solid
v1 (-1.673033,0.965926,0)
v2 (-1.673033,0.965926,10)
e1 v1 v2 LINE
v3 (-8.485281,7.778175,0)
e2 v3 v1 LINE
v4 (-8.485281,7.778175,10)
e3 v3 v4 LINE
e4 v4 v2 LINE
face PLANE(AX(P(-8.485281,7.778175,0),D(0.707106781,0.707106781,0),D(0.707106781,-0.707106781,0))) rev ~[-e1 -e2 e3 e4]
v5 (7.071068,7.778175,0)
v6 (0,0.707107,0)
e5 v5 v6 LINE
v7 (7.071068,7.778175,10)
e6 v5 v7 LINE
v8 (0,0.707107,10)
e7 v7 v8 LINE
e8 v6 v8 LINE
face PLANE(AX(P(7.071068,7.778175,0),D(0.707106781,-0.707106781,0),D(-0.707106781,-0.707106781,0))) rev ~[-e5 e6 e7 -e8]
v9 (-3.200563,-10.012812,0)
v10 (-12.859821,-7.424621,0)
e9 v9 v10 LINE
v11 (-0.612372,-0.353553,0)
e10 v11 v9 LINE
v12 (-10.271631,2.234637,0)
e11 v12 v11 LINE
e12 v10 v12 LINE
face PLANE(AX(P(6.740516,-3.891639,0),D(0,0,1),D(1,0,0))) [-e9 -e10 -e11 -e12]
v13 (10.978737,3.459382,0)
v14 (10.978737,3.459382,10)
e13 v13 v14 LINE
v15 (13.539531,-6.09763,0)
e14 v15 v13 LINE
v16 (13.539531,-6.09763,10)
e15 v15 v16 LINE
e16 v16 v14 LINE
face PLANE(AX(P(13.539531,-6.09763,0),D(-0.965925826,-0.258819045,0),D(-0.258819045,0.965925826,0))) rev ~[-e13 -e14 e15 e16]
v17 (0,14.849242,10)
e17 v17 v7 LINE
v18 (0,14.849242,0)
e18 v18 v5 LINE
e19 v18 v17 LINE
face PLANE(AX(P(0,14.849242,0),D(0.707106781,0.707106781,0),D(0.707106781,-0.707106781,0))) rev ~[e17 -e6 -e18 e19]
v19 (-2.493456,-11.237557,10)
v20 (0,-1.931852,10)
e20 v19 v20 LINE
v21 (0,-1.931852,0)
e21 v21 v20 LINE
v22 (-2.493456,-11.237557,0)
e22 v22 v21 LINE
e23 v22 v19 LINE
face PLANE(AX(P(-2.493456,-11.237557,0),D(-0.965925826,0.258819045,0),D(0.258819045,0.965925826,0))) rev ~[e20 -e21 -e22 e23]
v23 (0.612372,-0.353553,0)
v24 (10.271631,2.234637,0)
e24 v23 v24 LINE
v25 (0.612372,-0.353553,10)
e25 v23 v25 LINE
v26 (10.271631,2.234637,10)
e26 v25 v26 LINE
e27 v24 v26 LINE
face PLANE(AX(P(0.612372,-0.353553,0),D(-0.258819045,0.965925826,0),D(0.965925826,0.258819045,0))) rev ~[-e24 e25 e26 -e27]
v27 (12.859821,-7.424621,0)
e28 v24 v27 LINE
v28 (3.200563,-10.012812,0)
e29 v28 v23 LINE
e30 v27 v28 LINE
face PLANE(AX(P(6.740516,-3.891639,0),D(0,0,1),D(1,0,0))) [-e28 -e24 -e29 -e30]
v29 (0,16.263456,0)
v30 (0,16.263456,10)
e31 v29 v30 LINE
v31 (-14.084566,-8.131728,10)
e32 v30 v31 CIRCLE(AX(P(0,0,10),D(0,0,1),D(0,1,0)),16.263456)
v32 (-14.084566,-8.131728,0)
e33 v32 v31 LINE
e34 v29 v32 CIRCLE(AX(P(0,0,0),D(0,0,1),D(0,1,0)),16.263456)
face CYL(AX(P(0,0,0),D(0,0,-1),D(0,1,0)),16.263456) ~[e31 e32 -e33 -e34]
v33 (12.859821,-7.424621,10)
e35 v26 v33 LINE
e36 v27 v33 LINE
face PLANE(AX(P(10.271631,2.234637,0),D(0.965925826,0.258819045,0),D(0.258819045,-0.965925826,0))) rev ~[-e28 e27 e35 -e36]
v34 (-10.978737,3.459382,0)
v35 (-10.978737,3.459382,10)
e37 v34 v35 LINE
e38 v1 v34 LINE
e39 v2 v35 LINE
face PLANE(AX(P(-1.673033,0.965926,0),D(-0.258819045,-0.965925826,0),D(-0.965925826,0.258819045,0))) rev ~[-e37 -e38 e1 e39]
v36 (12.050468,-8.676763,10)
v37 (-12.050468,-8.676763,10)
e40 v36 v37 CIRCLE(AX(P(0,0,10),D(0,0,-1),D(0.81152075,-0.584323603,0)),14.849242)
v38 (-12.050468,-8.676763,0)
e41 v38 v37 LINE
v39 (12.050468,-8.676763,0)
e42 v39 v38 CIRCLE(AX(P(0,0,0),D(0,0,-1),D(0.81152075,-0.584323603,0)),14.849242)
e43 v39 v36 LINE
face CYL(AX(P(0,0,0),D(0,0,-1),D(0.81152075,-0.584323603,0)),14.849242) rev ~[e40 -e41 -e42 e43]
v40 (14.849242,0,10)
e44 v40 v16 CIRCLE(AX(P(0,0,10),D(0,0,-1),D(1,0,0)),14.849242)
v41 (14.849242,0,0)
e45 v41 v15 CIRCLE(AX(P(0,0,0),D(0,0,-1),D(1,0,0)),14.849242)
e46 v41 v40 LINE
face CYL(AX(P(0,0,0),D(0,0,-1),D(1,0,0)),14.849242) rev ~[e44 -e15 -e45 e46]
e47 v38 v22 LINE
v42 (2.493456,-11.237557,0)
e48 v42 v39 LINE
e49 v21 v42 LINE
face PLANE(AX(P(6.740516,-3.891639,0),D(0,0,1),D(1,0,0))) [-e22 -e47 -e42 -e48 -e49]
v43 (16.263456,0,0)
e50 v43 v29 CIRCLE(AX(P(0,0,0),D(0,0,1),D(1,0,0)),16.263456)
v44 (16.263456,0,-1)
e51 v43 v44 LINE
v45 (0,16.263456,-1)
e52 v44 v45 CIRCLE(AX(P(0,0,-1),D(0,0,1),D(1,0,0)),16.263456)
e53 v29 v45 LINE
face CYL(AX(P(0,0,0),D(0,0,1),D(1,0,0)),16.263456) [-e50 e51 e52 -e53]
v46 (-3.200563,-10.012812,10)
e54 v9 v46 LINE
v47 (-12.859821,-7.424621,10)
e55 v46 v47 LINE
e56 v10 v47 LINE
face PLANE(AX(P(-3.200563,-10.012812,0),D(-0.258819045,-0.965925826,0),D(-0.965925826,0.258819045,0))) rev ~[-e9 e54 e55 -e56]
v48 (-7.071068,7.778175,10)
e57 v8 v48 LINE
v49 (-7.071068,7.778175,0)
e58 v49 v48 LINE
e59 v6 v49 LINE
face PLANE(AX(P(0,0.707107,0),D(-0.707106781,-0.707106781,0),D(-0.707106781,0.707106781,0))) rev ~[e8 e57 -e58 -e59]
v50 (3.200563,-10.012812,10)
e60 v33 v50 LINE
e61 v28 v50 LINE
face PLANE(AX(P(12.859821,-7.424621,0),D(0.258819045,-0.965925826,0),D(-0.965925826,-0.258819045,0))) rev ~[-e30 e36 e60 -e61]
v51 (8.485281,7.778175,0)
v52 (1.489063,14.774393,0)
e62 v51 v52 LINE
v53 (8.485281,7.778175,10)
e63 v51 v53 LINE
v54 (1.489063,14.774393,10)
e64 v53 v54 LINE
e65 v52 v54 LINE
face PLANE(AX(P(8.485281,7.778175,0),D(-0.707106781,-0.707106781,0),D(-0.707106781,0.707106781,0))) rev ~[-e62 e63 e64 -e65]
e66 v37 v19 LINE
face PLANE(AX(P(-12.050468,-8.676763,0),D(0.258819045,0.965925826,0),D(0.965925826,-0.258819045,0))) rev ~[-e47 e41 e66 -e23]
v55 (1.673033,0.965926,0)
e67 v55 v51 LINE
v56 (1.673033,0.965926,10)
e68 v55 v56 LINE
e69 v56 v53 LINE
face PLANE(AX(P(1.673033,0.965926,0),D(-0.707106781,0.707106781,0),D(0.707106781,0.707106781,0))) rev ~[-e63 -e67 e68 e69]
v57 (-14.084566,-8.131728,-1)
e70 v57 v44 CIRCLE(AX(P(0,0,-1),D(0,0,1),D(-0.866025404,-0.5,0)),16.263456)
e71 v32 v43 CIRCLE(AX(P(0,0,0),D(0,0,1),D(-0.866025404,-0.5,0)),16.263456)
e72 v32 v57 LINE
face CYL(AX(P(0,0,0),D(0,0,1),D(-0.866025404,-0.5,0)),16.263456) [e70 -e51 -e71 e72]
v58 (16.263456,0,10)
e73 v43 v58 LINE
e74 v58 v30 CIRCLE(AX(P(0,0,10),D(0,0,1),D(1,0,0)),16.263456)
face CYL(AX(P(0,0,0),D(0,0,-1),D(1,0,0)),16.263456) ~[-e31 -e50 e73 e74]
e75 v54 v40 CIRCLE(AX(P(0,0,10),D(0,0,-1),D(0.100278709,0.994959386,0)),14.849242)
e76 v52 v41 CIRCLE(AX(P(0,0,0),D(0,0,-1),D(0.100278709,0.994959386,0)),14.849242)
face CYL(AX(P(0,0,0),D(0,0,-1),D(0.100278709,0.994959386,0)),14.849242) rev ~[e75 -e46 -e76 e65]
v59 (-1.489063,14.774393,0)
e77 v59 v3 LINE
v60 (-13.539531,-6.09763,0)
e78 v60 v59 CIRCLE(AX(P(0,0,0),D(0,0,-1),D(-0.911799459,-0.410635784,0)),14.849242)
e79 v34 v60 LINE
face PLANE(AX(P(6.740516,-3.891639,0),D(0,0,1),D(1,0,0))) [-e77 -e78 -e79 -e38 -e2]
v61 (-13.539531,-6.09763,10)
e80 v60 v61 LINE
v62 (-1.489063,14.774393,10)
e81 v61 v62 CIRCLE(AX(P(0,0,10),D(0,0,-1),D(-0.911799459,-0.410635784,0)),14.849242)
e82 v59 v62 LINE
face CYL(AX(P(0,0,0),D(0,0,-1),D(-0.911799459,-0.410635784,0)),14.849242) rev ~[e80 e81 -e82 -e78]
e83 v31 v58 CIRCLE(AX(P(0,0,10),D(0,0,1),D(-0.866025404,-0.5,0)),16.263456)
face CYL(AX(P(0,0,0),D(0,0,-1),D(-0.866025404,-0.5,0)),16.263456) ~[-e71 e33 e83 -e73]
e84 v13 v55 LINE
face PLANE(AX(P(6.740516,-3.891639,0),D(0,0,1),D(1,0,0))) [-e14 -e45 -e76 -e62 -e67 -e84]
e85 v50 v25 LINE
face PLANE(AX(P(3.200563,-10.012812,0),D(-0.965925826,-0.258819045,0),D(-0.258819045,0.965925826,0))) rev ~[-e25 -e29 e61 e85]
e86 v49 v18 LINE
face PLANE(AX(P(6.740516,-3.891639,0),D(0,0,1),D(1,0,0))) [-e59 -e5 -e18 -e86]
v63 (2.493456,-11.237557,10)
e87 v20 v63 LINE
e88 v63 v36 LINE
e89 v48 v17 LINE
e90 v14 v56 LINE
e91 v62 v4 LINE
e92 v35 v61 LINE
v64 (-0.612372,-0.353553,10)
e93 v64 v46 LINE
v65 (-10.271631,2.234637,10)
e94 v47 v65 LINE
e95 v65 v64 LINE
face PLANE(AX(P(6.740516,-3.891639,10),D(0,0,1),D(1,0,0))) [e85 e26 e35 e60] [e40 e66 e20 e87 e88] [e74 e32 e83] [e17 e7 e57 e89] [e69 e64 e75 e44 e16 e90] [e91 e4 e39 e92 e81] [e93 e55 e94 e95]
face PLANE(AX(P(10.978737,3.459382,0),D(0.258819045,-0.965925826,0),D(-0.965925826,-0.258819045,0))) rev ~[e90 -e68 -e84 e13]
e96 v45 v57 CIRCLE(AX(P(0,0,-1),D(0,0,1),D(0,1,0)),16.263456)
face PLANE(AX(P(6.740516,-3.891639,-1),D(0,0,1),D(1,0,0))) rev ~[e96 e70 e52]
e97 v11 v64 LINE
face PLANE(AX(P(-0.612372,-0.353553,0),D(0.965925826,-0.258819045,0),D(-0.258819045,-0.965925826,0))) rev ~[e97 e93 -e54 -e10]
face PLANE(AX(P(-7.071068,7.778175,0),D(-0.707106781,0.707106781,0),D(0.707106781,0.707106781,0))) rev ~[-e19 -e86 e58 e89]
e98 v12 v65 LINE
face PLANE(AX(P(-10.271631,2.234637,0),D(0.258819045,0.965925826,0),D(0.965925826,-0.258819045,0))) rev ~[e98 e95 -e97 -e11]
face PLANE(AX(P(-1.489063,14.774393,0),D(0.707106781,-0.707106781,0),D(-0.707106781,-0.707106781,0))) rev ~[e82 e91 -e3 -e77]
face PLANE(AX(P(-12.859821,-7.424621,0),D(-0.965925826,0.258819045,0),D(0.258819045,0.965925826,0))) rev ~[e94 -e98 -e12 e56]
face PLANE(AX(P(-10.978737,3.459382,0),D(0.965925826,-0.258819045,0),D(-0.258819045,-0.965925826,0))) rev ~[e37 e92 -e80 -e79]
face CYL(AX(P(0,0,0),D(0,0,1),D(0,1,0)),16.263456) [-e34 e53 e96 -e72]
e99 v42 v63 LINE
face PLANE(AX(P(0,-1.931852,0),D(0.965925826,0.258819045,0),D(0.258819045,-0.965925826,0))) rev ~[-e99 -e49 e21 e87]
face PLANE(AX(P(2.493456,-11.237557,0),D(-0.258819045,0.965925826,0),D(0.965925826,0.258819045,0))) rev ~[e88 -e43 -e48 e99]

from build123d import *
from build123d import SkipClean  # not in build123d's __all__

# Parameters (mm, degrees)
F1_DEPTH = 1
F2_DEPTH = 10


with BuildPart() as f1:
    # F0 (on Top) → F1 (new body)
    with BuildSketch(Plane.XY):
        with BuildLine():
            Line((10.9787374798, 3.4593819318), (1.6730326075, 0.9659258263))
            Line((1.6730326075, 0.9659258263), (0.4482877361, -0.2588190451))
            Line((0.4482877361, -0.2588190451), (0, -1.9318516526))
            Line((0, -1.9318516526), (2.4934561055, -11.2375565249))
            Line((2.4934561055, -11.2375565249), (12.0504683321, -8.6767628167))
            ThreePointArc((12.0504683321, -8.6767628167), (12.4708698642, -8.0608563335), (12.8598211496, -7.4246212025))
            ThreePointArc((12.8598211496, -7.4246212025), (13.2163412932, -6.769661943), (13.5395311879, -6.0976302947))
            Line((13.5395311879, -6.0976302947), (10.9787374798, 3.4593819318))
        make_face()
        Polygon((10.2716306986, 2.2346370604), (12.8598211496, -7.4246212025), (3.2005628867, -10.0128116535), (0.6123724357, -0.3535533906), align=None, mode=Mode.SUBTRACT)
        with BuildLine():
            ThreePointArc((1.4890628559, 14.7743931114), (0.7454714289, 14.8305182765), (0, 14.8492424049))
            ThreePointArc((0, 14.8492424049), (-0.7454714289, 14.8305182765), (-1.4890628559, 14.7743931114))
            Line((-1.4890628559, 14.7743931114), (-8.4852813742, 7.7781745931))
            Line((-8.4852813742, 7.7781745931), (-1.6730326075, 0.9659258263))
            Line((-1.6730326075, 0.9659258263), (0, 0.5176380902))
            Line((0, 0.5176380902), (1.6730326075, 0.9659258263))
            Line((1.6730326075, 0.9659258263), (8.4852813742, 7.7781745931))
            Line((8.4852813742, 7.7781745931), (1.4890628559, 14.7743931114))
        make_face()
        Polygon((-7.0710678119, 7.7781745931), (0, 14.8492424049), (7.0710678119, 7.7781745931), (0, 0.7071067812), align=None, mode=Mode.SUBTRACT)
        with BuildLine():
            Line((-10.9787374798, 3.4593819318), (-13.5395311879, -6.0976302947))
            ThreePointArc((-13.5395311879, -6.0976302947), (-13.2163412932, -6.769661943), (-12.8598211496, -7.4246212025))
            ThreePointArc((-12.8598211496, -7.4246212025), (-12.4708698642, -8.0608563335), (-12.0504683321, -8.6767628167))
            Line((-12.0504683321, -8.6767628167), (-2.4934561055, -11.2375565249))
            Line((-2.4934561055, -11.2375565249), (0, -1.9318516526))
            Line((0, -1.9318516526), (-0.4482877361, -0.2588190451))
            Line((-0.4482877361, -0.2588190451), (-1.6730326075, 0.9659258263))
            Line((-1.6730326075, 0.9659258263), (-10.9787374798, 3.4593819318))
        make_face()
        Polygon((-3.2005628867, -10.0128116535), (-12.8598211496, -7.4246212025), (-10.2716306986, 2.2346370604), (-0.6123724357, -0.3535533906), align=None, mode=Mode.SUBTRACT)
        Polygon((-10.2716306986, 2.2346370604), (-12.8598211496, -7.4246212025), (-3.2005628867, -10.0128116535), (-0.6123724357, -0.3535533906), align=None)
        Polygon((3.2005628867, -10.0128116535), (12.8598211496, -7.4246212025), (10.2716306986, 2.2346370604), (0.6123724357, -0.3535533906), align=None)
        Polygon((7.0710678119, 7.7781745931), (0, 14.8492424049), (-7.0710678119, 7.7781745931), (0, 0.7071067812), align=None)
        with BuildLine():
            Line((-8.4852813742, 7.7781745931), (-1.4890628559, 14.7743931114))
            ThreePointArc((-1.4890628559, 14.7743931114), (-12.8598211496, 7.4246212025), (-13.5395311879, -6.0976302947))
            Line((-13.5395311879, -6.0976302947), (-10.9787374798, 3.4593819318))
            Line((-10.9787374798, 3.4593819318), (-1.6730326075, 0.9659258263))
            Line((-1.6730326075, 0.9659258263), (-8.4852813742, 7.7781745931))
        make_face()
        with BuildLine():
            ThreePointArc((14.8492424049, 0), (11.0138879444, 9.9596321392), (1.4890628559, 14.7743931114))
            Line((1.4890628559, 14.7743931114), (8.4852813742, 7.7781745931))
            Line((8.4852813742, 7.7781745931), (1.6730326075, 0.9659258263))
            Line((1.6730326075, 0.9659258263), (10.9787374798, 3.4593819318))
            Line((10.9787374798, 3.4593819318), (13.5395311879, -6.0976302947))
            ThreePointArc((13.5395311879, -6.0976302947), (14.5181228239, -3.1183504727), (14.8492424049, 0))
        make_face()
        with BuildLine():
            Line((-2.4934561055, -11.2375565249), (-12.0504683321, -8.6767628167))
            ThreePointArc((-12.0504683321, -8.6767628167), (0, -14.8492424049), (12.0504683321, -8.6767628167))
            Line((12.0504683321, -8.6767628167), (2.4934561055, -11.2375565249))
            Line((2.4934561055, -11.2375565249), (0, -1.9318516526))
            Line((0, -1.9318516526), (-2.4934561055, -11.2375565249))
        make_face()
        with BuildLine():
            ThreePointArc((-13.5395311879, -6.0976302947), (-12.8598211496, 7.4246212025), (-1.4890628559, 14.7743931114))
            Line((-1.4890628559, 14.7743931114), (0, 16.2634559673))
            ThreePointArc((0, 16.2634559673), (-14.084566021, 8.1317279836), (-14.084566021, -8.1317279836))
            Line((-14.084566021, -8.1317279836), (-13.5395311879, -6.0976302947))
        make_face()
        with BuildLine():
            Line((0, 16.2634559673), (1.4890628559, 14.7743931114))
            ThreePointArc((1.4890628559, 14.7743931114), (11.0138879444, 9.9596321392), (14.8492424049, 0))
            ThreePointArc((14.8492424049, 0), (14.5181228239, -3.1183504727), (13.5395311879, -6.0976302947))
            Line((13.5395311879, -6.0976302947), (14.084566021, -8.1317279836))
            ThreePointArc((14.084566021, -8.1317279836), (15.7092921435, -4.2092921435), (16.2634559673, 0))
            ThreePointArc((16.2634559673, 0), (11.5, 11.5), (0, 16.2634559673))
        make_face()
        with BuildLine():
            Line((-12.0504683321, -8.6767628167), (-14.084566021, -8.1317279836))
            ThreePointArc((-14.084566021, -8.1317279836), (0, -16.2634559673), (14.084566021, -8.1317279836))
            Line((14.084566021, -8.1317279836), (12.0504683321, -8.6767628167))
            ThreePointArc((12.0504683321, -8.6767628167), (0, -14.8492424049), (-12.0504683321, -8.6767628167))
        make_face()
        with BuildLine():
            ThreePointArc((-1.4890628559, 14.7743931114), (-0.7454714289, 14.8305182765), (0, 14.8492424049))
            ThreePointArc((0, 14.8492424049), (0.7454714289, 14.8305182765), (1.4890628559, 14.7743931114))
            Line((1.4890628559, 14.7743931114), (0, 16.2634559673))
            Line((0, 16.2634559673), (-1.4890628559, 14.7743931114))
        make_face()
        with BuildLine():
            Line((14.084566021, -8.1317279836), (13.5395311879, -6.0976302947))
            ThreePointArc((13.5395311879, -6.0976302947), (13.2163412932, -6.769661943), (12.8598211496, -7.4246212025))
            ThreePointArc((12.8598211496, -7.4246212025), (12.4708698642, -8.0608563335), (12.0504683321, -8.6767628167))
            Line((12.0504683321, -8.6767628167), (14.084566021, -8.1317279836))
        make_face()
        with BuildLine():
            ThreePointArc((-12.8598211496, -7.4246212025), (-13.2163412932, -6.769661943), (-13.5395311879, -6.0976302947))
            Line((-13.5395311879, -6.0976302947), (-14.084566021, -8.1317279836))
            Line((-14.084566021, -8.1317279836), (-12.0504683321, -8.6767628167))
            ThreePointArc((-12.0504683321, -8.6767628167), (-12.4708698642, -8.0608563335), (-12.8598211496, -7.4246212025))
        make_face()
        Polygon((0, -0.7071067812), (0.4482877361, -0.2588190451), (0.6123724357, 0.3535533906), (0, 0.5176380902), (-0.6123724357, 0.3535533906), (-0.4482877361, -0.2588190451), align=None)
        Polygon((0, -1.9318516526), (0.4482877361, -0.2588190451), (0, -0.7071067812), (-0.4482877361, -0.2588190451), align=None)
        Polygon((0, 0.5176380902), (-1.6730326075, 0.9659258263), (-0.4482877361, -0.2588190451), (-0.6123724357, 0.3535533906), align=None)
        Polygon((0.4482877361, -0.2588190451), (1.6730326075, 0.9659258263), (0, 0.5176380902), (0.6123724357, 0.3535533906), align=None)
    extrude(amount=-F1_DEPTH)

    # F0 (on Top) → F2 (join)
    with BuildSketch(Plane.XY):
        with BuildLine():
            Line((10.9787374798, 3.4593819318), (1.6730326075, 0.9659258263))
            Line((1.6730326075, 0.9659258263), (0.4482877361, -0.2588190451))
            Line((0.4482877361, -0.2588190451), (0, -1.9318516526))
            Line((0, -1.9318516526), (2.4934561055, -11.2375565249))
            Line((2.4934561055, -11.2375565249), (12.0504683321, -8.6767628167))
            ThreePointArc((12.0504683321, -8.6767628167), (12.4708698642, -8.0608563335), (12.8598211496, -7.4246212025))
            ThreePointArc((12.8598211496, -7.4246212025), (13.2163412932, -6.769661943), (13.5395311879, -6.0976302947))
            Line((13.5395311879, -6.0976302947), (10.9787374798, 3.4593819318))
        make_face()
        Polygon((10.2716306986, 2.2346370604), (12.8598211496, -7.4246212025), (3.2005628867, -10.0128116535), (0.6123724357, -0.3535533906), align=None, mode=Mode.SUBTRACT)
        with BuildLine():
            Line((0, 16.2634559673), (1.4890628559, 14.7743931114))
            ThreePointArc((1.4890628559, 14.7743931114), (11.0138879444, 9.9596321392), (14.8492424049, 0))
            ThreePointArc((14.8492424049, 0), (14.5181228239, -3.1183504727), (13.5395311879, -6.0976302947))
            Line((13.5395311879, -6.0976302947), (14.084566021, -8.1317279836))
            ThreePointArc((14.084566021, -8.1317279836), (15.7092921435, -4.2092921435), (16.2634559673, 0))
            ThreePointArc((16.2634559673, 0), (11.5, 11.5), (0, 16.2634559673))
        make_face()
        with BuildLine():
            ThreePointArc((-13.5395311879, -6.0976302947), (-12.8598211496, 7.4246212025), (-1.4890628559, 14.7743931114))
            Line((-1.4890628559, 14.7743931114), (0, 16.2634559673))
            ThreePointArc((0, 16.2634559673), (-14.084566021, 8.1317279836), (-14.084566021, -8.1317279836))
            Line((-14.084566021, -8.1317279836), (-13.5395311879, -6.0976302947))
        make_face()
        with BuildLine():
            ThreePointArc((1.4890628559, 14.7743931114), (0.7454714289, 14.8305182765), (0, 14.8492424049))
            ThreePointArc((0, 14.8492424049), (-0.7454714289, 14.8305182765), (-1.4890628559, 14.7743931114))
            Line((-1.4890628559, 14.7743931114), (-8.4852813742, 7.7781745931))
            Line((-8.4852813742, 7.7781745931), (-1.6730326075, 0.9659258263))
            Line((-1.6730326075, 0.9659258263), (0, 0.5176380902))
            Line((0, 0.5176380902), (1.6730326075, 0.9659258263))
            Line((1.6730326075, 0.9659258263), (8.4852813742, 7.7781745931))
            Line((8.4852813742, 7.7781745931), (1.4890628559, 14.7743931114))
        make_face()
        Polygon((-7.0710678119, 7.7781745931), (0, 14.8492424049), (7.0710678119, 7.7781745931), (0, 0.7071067812), align=None, mode=Mode.SUBTRACT)
        with BuildLine():
            Line((-12.0504683321, -8.6767628167), (-14.084566021, -8.1317279836))
            ThreePointArc((-14.084566021, -8.1317279836), (0, -16.2634559673), (14.084566021, -8.1317279836))
            Line((14.084566021, -8.1317279836), (12.0504683321, -8.6767628167))
            ThreePointArc((12.0504683321, -8.6767628167), (0, -14.8492424049), (-12.0504683321, -8.6767628167))
        make_face()
        with BuildLine():
            Line((-10.9787374798, 3.4593819318), (-13.5395311879, -6.0976302947))
            ThreePointArc((-13.5395311879, -6.0976302947), (-13.2163412932, -6.769661943), (-12.8598211496, -7.4246212025))
            ThreePointArc((-12.8598211496, -7.4246212025), (-12.4708698642, -8.0608563335), (-12.0504683321, -8.6767628167))
            Line((-12.0504683321, -8.6767628167), (-2.4934561055, -11.2375565249))
            Line((-2.4934561055, -11.2375565249), (0, -1.9318516526))
            Line((0, -1.9318516526), (-0.4482877361, -0.2588190451))
            Line((-0.4482877361, -0.2588190451), (-1.6730326075, 0.9659258263))
            Line((-1.6730326075, 0.9659258263), (-10.9787374798, 3.4593819318))
        make_face()
        Polygon((-3.2005628867, -10.0128116535), (-12.8598211496, -7.4246212025), (-10.2716306986, 2.2346370604), (-0.6123724357, -0.3535533906), align=None, mode=Mode.SUBTRACT)
        Polygon((0, -1.9318516526), (0.4482877361, -0.2588190451), (0, -0.7071067812), (-0.4482877361, -0.2588190451), align=None)
        with BuildLine():
            ThreePointArc((-1.4890628559, 14.7743931114), (-0.7454714289, 14.8305182765), (0, 14.8492424049))
            ThreePointArc((0, 14.8492424049), (0.7454714289, 14.8305182765), (1.4890628559, 14.7743931114))
            Line((1.4890628559, 14.7743931114), (0, 16.2634559673))
            Line((0, 16.2634559673), (-1.4890628559, 14.7743931114))
        make_face()
        Polygon((0, 0.5176380902), (-1.6730326075, 0.9659258263), (-0.4482877361, -0.2588190451), (-0.6123724357, 0.3535533906), align=None)
        with BuildLine():
            ThreePointArc((-12.8598211496, -7.4246212025), (-13.2163412932, -6.769661943), (-13.5395311879, -6.0976302947))
            Line((-13.5395311879, -6.0976302947), (-14.084566021, -8.1317279836))
            Line((-14.084566021, -8.1317279836), (-12.0504683321, -8.6767628167))
            ThreePointArc((-12.0504683321, -8.6767628167), (-12.4708698642, -8.0608563335), (-12.8598211496, -7.4246212025))
        make_face()
        with BuildLine():
            Line((14.084566021, -8.1317279836), (13.5395311879, -6.0976302947))
            ThreePointArc((13.5395311879, -6.0976302947), (13.2163412932, -6.769661943), (12.8598211496, -7.4246212025))
            ThreePointArc((12.8598211496, -7.4246212025), (12.4708698642, -8.0608563335), (12.0504683321, -8.6767628167))
            Line((12.0504683321, -8.6767628167), (14.084566021, -8.1317279836))
        make_face()
        Polygon((0.4482877361, -0.2588190451), (1.6730326075, 0.9659258263), (0, 0.5176380902), (0.6123724357, 0.3535533906), align=None)
        Polygon((0, -0.7071067812), (0.4482877361, -0.2588190451), (0.6123724357, 0.3535533906), (0, 0.5176380902), (-0.6123724357, 0.3535533906), (-0.4482877361, -0.2588190451), align=None)
    with SkipClean():  # cleaning this boolean's faces spoils the solid; the shape is the same uncleaned
        extrude(amount=F2_DEPTH)


solid = f1.part
